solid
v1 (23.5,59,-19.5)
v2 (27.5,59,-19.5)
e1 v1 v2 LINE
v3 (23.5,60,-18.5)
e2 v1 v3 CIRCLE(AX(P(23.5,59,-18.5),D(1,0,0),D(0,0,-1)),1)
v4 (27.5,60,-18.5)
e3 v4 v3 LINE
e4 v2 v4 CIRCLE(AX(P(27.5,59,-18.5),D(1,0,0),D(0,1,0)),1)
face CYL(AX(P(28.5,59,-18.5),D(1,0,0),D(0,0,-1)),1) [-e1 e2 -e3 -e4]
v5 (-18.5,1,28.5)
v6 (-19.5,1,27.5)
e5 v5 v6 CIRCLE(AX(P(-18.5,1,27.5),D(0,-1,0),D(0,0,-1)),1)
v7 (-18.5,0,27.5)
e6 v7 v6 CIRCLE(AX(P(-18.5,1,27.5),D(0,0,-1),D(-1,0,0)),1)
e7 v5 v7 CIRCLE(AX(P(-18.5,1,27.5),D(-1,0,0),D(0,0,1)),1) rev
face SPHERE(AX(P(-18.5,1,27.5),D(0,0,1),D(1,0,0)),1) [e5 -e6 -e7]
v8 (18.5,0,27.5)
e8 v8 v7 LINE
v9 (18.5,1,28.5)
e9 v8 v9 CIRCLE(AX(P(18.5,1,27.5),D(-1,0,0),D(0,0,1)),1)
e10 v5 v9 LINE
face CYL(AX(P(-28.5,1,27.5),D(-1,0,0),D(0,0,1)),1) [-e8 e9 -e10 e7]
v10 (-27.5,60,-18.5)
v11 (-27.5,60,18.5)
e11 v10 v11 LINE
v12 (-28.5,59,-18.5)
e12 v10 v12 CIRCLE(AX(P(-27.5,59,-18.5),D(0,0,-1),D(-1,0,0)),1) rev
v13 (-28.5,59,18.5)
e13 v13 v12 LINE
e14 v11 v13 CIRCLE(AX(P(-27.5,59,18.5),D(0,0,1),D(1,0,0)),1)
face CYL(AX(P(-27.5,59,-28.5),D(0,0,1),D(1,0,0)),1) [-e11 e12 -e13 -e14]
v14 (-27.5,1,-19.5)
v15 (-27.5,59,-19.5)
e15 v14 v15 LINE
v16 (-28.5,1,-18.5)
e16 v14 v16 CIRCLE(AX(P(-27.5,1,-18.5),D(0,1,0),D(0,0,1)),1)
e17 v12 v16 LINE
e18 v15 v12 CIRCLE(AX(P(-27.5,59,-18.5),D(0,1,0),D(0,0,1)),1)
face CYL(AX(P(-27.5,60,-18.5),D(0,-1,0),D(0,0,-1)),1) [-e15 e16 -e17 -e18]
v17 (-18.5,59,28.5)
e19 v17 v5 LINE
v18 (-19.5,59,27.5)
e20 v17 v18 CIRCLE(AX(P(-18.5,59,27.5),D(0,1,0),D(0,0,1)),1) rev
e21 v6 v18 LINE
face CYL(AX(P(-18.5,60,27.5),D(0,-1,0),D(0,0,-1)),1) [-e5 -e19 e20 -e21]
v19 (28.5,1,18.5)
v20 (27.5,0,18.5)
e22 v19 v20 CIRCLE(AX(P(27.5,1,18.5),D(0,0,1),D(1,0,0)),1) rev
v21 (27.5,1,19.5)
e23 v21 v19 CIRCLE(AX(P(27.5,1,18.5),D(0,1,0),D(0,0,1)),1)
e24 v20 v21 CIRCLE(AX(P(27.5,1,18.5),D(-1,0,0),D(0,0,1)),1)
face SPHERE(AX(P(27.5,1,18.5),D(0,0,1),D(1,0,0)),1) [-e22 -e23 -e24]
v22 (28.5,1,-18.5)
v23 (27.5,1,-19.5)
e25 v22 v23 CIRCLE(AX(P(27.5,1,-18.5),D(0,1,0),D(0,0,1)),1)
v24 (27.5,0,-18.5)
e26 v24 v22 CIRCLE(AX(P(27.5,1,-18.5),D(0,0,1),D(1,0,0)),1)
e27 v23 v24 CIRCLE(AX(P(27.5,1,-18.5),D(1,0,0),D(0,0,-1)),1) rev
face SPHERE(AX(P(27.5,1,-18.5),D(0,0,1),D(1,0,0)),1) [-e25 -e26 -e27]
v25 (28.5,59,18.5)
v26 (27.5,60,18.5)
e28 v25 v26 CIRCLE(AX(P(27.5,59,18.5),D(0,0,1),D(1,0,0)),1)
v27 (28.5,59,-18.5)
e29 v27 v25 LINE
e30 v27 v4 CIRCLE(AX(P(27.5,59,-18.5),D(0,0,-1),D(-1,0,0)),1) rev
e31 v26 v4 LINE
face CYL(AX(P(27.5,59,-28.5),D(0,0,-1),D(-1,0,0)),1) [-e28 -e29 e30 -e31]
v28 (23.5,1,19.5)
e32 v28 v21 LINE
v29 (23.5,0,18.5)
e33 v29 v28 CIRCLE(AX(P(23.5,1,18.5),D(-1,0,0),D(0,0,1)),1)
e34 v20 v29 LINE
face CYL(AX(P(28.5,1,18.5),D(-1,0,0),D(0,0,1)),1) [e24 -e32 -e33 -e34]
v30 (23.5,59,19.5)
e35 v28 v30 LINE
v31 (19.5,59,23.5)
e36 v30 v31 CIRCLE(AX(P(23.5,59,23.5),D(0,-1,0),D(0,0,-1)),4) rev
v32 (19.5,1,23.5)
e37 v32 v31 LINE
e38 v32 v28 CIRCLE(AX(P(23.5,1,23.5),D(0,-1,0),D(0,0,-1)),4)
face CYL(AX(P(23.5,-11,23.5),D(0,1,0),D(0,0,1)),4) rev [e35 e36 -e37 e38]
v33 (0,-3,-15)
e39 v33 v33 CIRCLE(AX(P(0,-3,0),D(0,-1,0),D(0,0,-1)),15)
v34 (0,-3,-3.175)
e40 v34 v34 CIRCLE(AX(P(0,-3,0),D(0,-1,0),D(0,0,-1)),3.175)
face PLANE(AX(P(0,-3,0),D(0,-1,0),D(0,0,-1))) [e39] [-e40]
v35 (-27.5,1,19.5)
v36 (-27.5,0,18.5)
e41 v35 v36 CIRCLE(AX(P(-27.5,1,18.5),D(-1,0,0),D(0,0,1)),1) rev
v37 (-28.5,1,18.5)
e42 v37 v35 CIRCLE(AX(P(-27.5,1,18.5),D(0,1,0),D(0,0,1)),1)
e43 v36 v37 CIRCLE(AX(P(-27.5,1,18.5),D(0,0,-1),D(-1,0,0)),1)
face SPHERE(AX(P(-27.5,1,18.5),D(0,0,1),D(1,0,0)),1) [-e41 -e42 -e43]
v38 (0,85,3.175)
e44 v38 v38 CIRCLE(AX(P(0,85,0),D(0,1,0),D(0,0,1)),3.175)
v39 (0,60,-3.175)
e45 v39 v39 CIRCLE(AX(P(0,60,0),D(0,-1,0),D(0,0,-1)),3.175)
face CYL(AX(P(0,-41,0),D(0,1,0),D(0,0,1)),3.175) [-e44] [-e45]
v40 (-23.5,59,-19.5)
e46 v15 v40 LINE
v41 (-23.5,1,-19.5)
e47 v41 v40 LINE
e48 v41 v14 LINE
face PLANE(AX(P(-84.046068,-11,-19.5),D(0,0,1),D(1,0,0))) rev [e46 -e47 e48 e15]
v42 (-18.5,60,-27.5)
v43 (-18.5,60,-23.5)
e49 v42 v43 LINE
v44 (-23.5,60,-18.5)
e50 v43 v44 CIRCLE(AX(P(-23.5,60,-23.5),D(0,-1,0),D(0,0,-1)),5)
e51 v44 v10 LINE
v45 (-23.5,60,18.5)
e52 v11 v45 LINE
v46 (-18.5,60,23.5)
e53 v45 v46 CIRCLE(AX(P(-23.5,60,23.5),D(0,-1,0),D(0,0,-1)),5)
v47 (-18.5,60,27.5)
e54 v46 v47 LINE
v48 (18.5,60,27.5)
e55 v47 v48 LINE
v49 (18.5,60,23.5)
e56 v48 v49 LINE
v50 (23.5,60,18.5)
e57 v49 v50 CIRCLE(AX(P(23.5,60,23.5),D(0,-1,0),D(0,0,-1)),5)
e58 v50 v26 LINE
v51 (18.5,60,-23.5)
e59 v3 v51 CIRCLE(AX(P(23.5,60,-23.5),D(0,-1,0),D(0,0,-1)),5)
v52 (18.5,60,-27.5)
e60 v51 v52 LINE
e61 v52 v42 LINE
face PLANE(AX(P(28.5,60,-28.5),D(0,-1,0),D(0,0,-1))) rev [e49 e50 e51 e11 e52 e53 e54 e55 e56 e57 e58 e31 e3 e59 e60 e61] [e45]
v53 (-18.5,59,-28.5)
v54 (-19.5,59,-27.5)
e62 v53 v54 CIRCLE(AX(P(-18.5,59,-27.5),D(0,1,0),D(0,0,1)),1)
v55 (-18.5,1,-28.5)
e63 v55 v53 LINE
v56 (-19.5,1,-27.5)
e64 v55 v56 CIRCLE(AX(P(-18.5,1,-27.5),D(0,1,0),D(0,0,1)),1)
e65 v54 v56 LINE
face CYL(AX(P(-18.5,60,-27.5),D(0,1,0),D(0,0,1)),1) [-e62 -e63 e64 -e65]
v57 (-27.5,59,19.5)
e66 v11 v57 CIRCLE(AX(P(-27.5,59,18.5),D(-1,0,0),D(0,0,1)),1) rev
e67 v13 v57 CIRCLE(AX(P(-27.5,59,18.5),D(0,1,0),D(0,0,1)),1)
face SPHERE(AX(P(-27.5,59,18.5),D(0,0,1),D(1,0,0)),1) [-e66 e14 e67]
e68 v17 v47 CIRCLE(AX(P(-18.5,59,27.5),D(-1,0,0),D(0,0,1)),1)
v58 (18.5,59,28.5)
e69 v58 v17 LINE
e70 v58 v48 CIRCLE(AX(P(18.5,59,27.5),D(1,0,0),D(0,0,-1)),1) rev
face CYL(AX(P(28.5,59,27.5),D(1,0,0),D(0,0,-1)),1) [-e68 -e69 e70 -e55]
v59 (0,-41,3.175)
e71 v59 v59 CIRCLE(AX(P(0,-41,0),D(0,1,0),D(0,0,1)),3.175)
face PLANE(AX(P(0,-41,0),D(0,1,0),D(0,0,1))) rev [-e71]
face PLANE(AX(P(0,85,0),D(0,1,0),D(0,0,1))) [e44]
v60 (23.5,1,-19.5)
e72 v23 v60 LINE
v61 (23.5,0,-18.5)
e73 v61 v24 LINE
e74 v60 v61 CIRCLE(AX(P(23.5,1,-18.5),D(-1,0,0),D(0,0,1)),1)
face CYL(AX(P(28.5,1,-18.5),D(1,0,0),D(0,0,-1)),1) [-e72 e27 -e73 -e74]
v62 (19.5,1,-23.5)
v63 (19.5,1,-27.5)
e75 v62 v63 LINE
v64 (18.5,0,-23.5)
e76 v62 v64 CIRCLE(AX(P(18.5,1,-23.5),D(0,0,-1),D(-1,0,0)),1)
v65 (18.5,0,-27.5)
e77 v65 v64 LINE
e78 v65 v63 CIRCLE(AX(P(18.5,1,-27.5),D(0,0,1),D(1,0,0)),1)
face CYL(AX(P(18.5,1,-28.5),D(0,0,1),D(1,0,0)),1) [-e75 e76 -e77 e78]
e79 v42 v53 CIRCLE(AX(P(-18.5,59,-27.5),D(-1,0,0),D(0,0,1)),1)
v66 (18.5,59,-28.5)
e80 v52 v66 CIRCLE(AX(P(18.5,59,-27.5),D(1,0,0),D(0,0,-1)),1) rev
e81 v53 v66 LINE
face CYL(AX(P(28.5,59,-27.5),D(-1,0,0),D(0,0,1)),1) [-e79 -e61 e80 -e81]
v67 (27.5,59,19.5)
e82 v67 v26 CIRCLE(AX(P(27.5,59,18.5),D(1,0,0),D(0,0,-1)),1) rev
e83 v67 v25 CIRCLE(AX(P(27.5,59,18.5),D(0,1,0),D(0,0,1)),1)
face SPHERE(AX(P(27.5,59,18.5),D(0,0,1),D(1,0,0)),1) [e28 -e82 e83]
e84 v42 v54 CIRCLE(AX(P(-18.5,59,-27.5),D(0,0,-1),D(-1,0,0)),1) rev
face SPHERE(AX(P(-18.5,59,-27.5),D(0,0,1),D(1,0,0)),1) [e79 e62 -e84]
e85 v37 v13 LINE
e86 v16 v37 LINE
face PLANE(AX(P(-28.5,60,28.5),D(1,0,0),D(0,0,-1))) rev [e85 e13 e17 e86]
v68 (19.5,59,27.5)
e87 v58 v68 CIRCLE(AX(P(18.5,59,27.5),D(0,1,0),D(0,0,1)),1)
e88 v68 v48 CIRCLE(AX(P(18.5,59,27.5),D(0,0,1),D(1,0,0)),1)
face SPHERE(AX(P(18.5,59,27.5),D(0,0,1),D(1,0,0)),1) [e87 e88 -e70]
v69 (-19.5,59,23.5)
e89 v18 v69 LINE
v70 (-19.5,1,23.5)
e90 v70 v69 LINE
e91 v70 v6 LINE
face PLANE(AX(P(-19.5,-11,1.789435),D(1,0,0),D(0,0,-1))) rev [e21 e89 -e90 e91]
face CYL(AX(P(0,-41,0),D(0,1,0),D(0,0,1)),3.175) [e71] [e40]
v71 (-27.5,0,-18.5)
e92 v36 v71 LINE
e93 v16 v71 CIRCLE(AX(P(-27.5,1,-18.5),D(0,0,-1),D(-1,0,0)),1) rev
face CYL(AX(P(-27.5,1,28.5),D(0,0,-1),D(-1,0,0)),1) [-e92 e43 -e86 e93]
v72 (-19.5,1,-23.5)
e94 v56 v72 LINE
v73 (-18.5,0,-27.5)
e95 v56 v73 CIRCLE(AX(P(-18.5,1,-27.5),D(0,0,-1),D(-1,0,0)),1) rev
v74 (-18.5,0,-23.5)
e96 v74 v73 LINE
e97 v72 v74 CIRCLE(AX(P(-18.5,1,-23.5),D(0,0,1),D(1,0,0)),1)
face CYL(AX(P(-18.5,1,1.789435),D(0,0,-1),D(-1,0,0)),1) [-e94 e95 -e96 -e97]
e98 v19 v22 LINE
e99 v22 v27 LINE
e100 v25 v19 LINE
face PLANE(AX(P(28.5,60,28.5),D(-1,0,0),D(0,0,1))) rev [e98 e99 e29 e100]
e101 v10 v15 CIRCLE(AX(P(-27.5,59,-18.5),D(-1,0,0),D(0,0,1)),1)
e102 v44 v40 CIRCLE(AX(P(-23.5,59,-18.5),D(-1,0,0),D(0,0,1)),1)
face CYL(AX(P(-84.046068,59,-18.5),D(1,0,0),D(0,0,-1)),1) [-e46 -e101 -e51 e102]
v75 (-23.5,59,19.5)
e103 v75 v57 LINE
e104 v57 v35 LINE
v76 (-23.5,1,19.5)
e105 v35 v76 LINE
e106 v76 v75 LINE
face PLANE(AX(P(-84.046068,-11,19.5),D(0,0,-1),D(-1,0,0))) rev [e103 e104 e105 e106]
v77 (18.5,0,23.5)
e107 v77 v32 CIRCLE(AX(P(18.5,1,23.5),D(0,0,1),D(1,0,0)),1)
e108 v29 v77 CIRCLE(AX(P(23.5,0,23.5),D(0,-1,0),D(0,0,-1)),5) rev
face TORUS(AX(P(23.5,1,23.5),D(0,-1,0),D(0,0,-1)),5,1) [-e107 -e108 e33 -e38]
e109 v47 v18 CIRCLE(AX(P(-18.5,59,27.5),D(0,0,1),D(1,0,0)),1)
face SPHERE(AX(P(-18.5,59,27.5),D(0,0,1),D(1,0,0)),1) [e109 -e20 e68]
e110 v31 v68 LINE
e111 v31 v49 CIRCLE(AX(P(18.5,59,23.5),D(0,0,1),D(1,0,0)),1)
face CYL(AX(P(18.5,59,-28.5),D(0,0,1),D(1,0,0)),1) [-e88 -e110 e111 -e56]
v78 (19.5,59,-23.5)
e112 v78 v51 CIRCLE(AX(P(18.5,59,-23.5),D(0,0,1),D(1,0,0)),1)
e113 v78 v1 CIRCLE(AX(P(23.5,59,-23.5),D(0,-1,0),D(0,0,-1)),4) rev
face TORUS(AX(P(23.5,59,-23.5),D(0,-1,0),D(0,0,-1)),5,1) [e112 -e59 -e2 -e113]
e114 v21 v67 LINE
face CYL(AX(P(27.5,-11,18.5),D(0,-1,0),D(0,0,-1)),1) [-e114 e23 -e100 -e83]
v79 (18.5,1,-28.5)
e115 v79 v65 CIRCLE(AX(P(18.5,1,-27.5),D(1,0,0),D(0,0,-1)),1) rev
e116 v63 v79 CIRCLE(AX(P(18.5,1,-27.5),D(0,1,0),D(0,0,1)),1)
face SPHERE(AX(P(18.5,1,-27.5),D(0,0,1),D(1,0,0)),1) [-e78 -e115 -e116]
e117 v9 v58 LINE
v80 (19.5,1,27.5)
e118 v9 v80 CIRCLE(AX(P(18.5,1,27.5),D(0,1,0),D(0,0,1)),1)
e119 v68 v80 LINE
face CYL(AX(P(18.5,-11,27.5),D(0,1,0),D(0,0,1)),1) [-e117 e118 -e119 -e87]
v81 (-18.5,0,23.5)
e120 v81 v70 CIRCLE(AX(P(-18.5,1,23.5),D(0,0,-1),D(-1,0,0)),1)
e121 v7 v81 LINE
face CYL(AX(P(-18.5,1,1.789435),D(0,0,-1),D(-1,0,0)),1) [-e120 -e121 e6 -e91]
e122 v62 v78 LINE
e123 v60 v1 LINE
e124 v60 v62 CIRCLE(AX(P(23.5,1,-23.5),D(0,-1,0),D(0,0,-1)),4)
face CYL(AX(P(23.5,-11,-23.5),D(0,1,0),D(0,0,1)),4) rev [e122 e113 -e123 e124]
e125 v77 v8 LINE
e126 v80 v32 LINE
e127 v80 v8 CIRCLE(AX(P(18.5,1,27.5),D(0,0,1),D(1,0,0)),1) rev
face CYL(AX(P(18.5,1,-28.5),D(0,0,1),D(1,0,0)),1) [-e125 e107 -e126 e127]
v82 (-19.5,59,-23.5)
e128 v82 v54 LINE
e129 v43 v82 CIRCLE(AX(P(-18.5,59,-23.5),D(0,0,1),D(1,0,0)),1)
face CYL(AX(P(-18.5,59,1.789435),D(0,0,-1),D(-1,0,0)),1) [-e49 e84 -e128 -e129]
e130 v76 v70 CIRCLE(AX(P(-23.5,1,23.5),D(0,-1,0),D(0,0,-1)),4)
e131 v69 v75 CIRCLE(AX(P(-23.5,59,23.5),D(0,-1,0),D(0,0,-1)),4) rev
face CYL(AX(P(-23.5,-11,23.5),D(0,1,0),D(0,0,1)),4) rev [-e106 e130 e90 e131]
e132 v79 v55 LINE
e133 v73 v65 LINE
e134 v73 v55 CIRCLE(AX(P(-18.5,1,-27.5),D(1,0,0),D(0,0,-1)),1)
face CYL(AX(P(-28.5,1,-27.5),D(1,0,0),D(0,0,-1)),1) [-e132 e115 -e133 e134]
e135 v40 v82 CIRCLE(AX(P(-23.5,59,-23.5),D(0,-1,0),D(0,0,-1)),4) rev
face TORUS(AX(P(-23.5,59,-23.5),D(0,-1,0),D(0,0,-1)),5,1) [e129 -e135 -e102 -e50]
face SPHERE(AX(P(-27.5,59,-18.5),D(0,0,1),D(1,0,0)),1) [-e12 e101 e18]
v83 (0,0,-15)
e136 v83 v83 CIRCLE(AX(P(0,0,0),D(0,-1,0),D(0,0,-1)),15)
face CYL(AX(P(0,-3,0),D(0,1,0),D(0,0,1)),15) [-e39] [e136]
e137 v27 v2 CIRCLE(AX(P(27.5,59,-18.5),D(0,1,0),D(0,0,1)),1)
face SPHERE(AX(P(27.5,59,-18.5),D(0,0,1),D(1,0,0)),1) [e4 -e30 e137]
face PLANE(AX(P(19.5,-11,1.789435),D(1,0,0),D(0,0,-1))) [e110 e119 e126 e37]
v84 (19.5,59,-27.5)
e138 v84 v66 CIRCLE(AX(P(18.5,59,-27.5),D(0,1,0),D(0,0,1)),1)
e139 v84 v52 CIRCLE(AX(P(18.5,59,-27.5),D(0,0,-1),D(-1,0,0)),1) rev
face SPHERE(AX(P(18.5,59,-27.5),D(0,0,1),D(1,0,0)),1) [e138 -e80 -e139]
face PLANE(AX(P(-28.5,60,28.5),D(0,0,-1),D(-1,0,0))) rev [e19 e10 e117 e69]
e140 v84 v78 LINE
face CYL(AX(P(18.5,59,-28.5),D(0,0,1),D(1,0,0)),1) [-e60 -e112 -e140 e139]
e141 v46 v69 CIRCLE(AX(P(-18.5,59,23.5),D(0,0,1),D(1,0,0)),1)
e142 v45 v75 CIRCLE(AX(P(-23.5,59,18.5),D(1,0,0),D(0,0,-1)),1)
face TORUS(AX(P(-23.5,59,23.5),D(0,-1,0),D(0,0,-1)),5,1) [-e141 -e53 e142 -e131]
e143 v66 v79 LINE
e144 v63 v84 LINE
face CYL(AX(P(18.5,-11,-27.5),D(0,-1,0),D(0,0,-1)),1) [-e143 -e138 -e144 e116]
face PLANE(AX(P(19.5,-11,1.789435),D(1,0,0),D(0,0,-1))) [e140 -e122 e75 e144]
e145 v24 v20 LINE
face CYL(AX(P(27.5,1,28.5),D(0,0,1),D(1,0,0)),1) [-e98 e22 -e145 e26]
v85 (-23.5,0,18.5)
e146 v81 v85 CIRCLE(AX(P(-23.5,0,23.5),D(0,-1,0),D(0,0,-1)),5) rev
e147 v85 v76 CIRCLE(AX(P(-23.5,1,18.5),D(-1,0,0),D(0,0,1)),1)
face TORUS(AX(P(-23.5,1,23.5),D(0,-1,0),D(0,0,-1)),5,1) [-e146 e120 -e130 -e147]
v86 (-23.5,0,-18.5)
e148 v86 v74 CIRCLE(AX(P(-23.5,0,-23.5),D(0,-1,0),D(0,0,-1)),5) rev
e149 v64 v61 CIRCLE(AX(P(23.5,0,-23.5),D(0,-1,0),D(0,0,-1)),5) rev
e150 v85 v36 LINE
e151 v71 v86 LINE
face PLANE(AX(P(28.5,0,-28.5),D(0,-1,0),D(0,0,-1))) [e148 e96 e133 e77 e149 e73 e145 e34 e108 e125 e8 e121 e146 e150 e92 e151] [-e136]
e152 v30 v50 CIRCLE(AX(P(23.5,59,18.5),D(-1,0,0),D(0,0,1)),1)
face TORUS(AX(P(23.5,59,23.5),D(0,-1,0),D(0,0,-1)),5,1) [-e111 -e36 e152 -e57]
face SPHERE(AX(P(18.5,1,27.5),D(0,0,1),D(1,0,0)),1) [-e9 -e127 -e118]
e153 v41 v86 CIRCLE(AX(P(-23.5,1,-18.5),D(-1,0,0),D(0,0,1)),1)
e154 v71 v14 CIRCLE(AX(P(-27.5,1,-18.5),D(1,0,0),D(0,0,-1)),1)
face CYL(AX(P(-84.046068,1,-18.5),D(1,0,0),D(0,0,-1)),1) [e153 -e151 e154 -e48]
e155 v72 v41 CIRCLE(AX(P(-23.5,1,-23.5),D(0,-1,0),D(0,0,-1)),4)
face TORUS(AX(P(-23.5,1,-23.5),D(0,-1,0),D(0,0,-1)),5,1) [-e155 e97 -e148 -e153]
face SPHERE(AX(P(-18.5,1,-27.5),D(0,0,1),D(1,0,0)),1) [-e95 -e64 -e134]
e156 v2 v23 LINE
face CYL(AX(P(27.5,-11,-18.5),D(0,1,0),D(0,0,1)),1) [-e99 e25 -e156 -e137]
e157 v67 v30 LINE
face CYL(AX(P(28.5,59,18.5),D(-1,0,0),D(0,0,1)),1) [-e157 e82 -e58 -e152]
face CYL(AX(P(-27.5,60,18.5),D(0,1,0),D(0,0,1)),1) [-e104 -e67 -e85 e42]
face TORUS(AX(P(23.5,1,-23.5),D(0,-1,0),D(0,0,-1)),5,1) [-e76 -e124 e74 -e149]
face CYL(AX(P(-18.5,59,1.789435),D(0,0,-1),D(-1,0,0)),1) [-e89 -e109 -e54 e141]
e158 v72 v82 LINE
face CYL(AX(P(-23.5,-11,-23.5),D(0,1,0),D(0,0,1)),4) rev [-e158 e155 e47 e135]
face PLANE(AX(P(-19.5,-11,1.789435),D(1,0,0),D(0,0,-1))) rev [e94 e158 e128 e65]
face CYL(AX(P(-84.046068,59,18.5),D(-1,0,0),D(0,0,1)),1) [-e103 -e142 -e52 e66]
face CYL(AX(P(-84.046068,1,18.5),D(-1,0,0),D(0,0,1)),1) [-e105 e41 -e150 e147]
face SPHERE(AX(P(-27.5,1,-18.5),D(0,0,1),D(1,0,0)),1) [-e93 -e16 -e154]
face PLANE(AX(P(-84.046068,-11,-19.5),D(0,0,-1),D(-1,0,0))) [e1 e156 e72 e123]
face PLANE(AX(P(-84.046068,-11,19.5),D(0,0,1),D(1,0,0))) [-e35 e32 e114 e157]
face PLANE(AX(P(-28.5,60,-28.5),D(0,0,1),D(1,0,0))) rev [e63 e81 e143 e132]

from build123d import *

# Parameters (mm, degrees)
SKETCH1_W                = 57
SKETCH1_H                = 57
EXTRUDE1_DEPTH           = 60
F_5_0_5_DIAMETER_HOLE1_D = 5
SKETCH6_R                = 4
SKETCH6_R_2              = 2.5
EXTRUDE4_DEPTH           = 71
FILLET1_R                = 1
EXTRUDE5_DEPTH           = 25
EXTRUDE5_DEPTH_BACK      = 101
SKETCH7_R                = 3.175
SKETCH8_R                = 15
EXTRUDE6_DEPTH           = 3
FILLET2_R                = 1


with BuildPart() as part:
    # Sketch1 → Extrude1 (new body)
    with BuildSketch(Plane(origin=(0, 0, 0), x_dir=(1, 0, 0), z_dir=(0, 1, 0))):
        Rectangle(SKETCH1_W, SKETCH1_H)
    extrude(amount=EXTRUDE1_DEPTH)

    # Ø5.0 (5) Diameter Hole1 (through all)
    with Locations(Plane.XZ):
        with Locations((-23.5, 23.5), (23.5, 23.5), (23.5, -23.5), (-23.5, -23.5)):
            Hole(F_5_0_5_DIAMETER_HOLE1_D / 2)

    # Sketch6 → Extrude4 (cut)
    # profile 1 of 12: a face of its own
    with BuildSketch(Plane(origin=(0, 60, 0), x_dir=(1, 0, 0), z_dir=(0, 1, 0))):
        Polygon((-28.5, 28.5), (-19.5, 28.5), (-19.5, 32.511741208), (-33.908905561, 32.511741208), (-33.908905561, 19.5), (-28.5, 19.5), align=None)
    # profile 2 of 12: a face of its own
    with BuildSketch(Plane(origin=(0, 60, 0), x_dir=(1, 0, 0), z_dir=(0, 1, 0))):
        with BuildLine():
            ThreePointArc((-23.5, 19.5), (-26.328427125, 26.328427125), (-19.5, 23.5))
            Line((-19.5, 23.5), (-19.5, 28.5))
            Line((-19.5, 28.5), (-28.5, 28.5))
            Line((-28.5, 28.5), (-28.5, 19.5))
            Line((-28.5, 19.5), (-23.5, 19.5))
        make_face()
    # profile 3 of 12: a face of its own
    with BuildSketch(Plane(origin=(0, 60, 0), x_dir=(1, 0, 0), z_dir=(0, 1, 0))):
        with Locations((-23.5, 23.5)):
            Circle(SKETCH6_R)
        with Locations((-23.5, 23.5)):
            Circle(SKETCH6_R_2, mode=Mode.SUBTRACT)
    # profile 4 of 12: a face of its own
    with BuildSketch(Plane(origin=(0, 60, 0), x_dir=(1, 0, 0), z_dir=(0, 1, 0))):
        Polygon((19.5, 36.471560472), (19.5, 28.5), (28.5, 28.5), (28.5, 19.5), (41.168352552, 19.5), (41.168352552, 36.471560472), align=None)
    # profile 5 of 12: a face of its own
    with BuildSketch(Plane(origin=(0, 60, 0), x_dir=(1, 0, 0), z_dir=(0, 1, 0))):
        with BuildLine():
            Line((28.5, 28.5), (19.5, 28.5))
            Line((19.5, 28.5), (19.5, 23.5))
            ThreePointArc((19.5, 23.5), (23.5, 27.5), (27.5, 23.5))
            ThreePointArc((27.5, 23.5), (26.328427125, 20.671572875), (23.5, 19.5))
            Line((23.5, 19.5), (28.5, 19.5))
            Line((28.5, 19.5), (28.5, 28.5))
        make_face()
    # profile 6 of 12: a face of its own
    with BuildSketch(Plane(origin=(0, 60, 0), x_dir=(1, 0, 0), z_dir=(0, 1, 0))):
        with Locations((23.5, 23.5)):
            Circle(SKETCH6_R)
        with Locations((23.5, 23.5)):
            Circle(SKETCH6_R_2, mode=Mode.SUBTRACT)
    # profile 7 of 12: a face of its own
    with BuildSketch(Plane(origin=(0, 60, 0), x_dir=(1, 0, 0), z_dir=(0, 1, 0))):
        with Locations((23.5, -23.5)):
            Circle(SKETCH6_R)
        with Locations((23.5, -23.5)):
            Circle(SKETCH6_R_2, mode=Mode.SUBTRACT)
    # profile 8 of 12: a face of its own
    with BuildSketch(Plane(origin=(0, 60, 0), x_dir=(1, 0, 0), z_dir=(0, 1, 0))):
        with BuildLine():
            Line((28.5, -28.5), (28.5, -19.5))
            Line((28.5, -19.5), (23.5, -19.5))
            ThreePointArc((23.5, -19.5), (26.328427125, -20.671572875), (27.5, -23.5))
            ThreePointArc((27.5, -23.5), (23.5, -27.5), (19.5, -23.5))
            Line((19.5, -23.5), (19.5, -28.5))
            Line((19.5, -28.5), (28.5, -28.5))
        make_face()
    # profile 9 of 12: a face of its own
    with BuildSketch(Plane(origin=(0, 60, 0), x_dir=(1, 0, 0), z_dir=(0, 1, 0))):
        Polygon((44.252209519, -19.5), (28.5, -19.5), (28.5, -28.5), (19.5, -28.5), (19.5, -40.050429997), (44.252209519, -40.050429997), align=None)
    # profile 10 of 12: a face of its own
    with BuildSketch(Plane(origin=(0, 60, 0), x_dir=(1, 0, 0), z_dir=(0, 1, 0))):
        Polygon((-28.5, -28.5), (-28.5, -19.5), (-37.670786859, -19.5), (-37.670786859, -37.828231874), (-19.5, -37.828231874), (-19.5, -28.5), align=None)
    # profile 11 of 12: a face of its own
    with BuildSketch(Plane(origin=(0, 60, 0), x_dir=(1, 0, 0), z_dir=(0, 1, 0))):
        with BuildLine():
            Line((-23.5, -19.5), (-28.5, -19.5))
            Line((-28.5, -19.5), (-28.5, -28.5))
            Line((-28.5, -28.5), (-19.5, -28.5))
            Line((-19.5, -28.5), (-19.5, -23.5))
            ThreePointArc((-19.5, -23.5), (-26.328427125, -26.328427125), (-23.5, -19.5))
        make_face()
    # profile 12 of 12: a face of its own
    with BuildSketch(Plane(origin=(0, 60, 0), x_dir=(1, 0, 0), z_dir=(0, 1, 0))):
        with Locations((-23.5, -23.5)):
            Circle(SKETCH6_R)
        with Locations((-23.5, -23.5)):
            Circle(SKETCH6_R_2, mode=Mode.SUBTRACT)
    extrude(amount=-EXTRUDE4_DEPTH, mode=Mode.SUBTRACT)

    # Fillet1
    fillet1_edges = [part.edges().sort_by_distance(p)[0] for p in [
        (0, 0, 28.5),
        (-20.671572875, 0, 20.671572875),
        (-19.5, 0, 26),
        (-26, 0, 19.5),
        (-28.5, 0, 0),
        (-20.671572875, 0, -20.671572875),
        (-19.5, 0, -26),
        (-26, 0, -19.5),
        (0, 0, -28.5),
        (20.671572875, 0, -20.671572875),
        (26, 0, -19.5),
        (19.5, 0, -26),
        (28.5, 0, 0),
        (20.671572875, 0, 20.671572875),
        (26, 0, 19.5),
        (19.5, 0, 26),
    ]]
    fillet(fillet1_edges, radius=FILLET1_R)



with BuildPart() as body_2:
    # Sketch7 → Extrude5 (new, two sides: drawn at the far end of the back side and taken through both)
    with BuildSketch(Plane(origin=(0, 60, 0), x_dir=(1, 0, 0), z_dir=(0, 1, 0)).offset(-EXTRUDE5_DEPTH_BACK)):
        with Locations(Location((0, 0, 0), (0, 0, 270))):
            Circle(SKETCH7_R)
    extrude(amount=EXTRUDE5_DEPTH + EXTRUDE5_DEPTH_BACK)


with BuildPart() as part_1:
    add(part.part)

    add(body_2.part)  # Extrude6 merges body 2
    # Sketch8 → Extrude6 (add)
    with BuildSketch(Plane.XZ):
        with Locations(Location((0, 0, 0), (0, 0, 270))):
            Circle(SKETCH8_R)
    extrude(amount=EXTRUDE6_DEPTH)

    # Fillet2
    # the kernel refuses this fillet: 1 mm, written as the material it takes off along each edge
    with BuildSketch(Plane(origin=(27.5, 1, -18.5), x_dir=(0, 0, -1), z_dir=(1, 0, 0))) as fillet2_piece_1_section:
        Polygon((0, 0), (FILLET2_R, 0), (FILLET2_R, -FILLET2_R), (0, -FILLET2_R), align=None)
    fillet2_piece_1 = extrude(amount=FILLET2_R, mode=Mode.PRIVATE)
    fillet2_piece_1 = fillet2_piece_1 - Plane(origin=(27.5, 1, -18.5), x_dir=(0, 0.7071067811865475, 0.7071067811865475), z_dir=(1, 0, 0)) * Sphere(FILLET2_R, mode=Mode.PRIVATE)
    add(fillet2_piece_1, mode=Mode.SUBTRACT)
    with BuildSketch(Plane(origin=(27.5, 1, 18.5), x_dir=(1, 0, 0), z_dir=(0, 0, 1))) as fillet2_piece_2_section:
        Polygon((0, 0), (FILLET2_R, 0), (FILLET2_R, -FILLET2_R), (0, -FILLET2_R), align=None)
    fillet2_piece_2 = extrude(amount=FILLET2_R, mode=Mode.PRIVATE)
    fillet2_piece_2 = fillet2_piece_2 - Plane(origin=(27.5, 1, 18.5), x_dir=(-0.7071067811865475, 0.7071067811865475, 0), z_dir=(0, 0, 1)) * Sphere(FILLET2_R, mode=Mode.PRIVATE)
    add(fillet2_piece_2, mode=Mode.SUBTRACT)
    with BuildSketch(Plane(origin=(18.5, 1, -27.5), x_dir=(1, 0, 0), z_dir=(0, 0, -1))) as fillet2_piece_3_section:
        Polygon((0, 0), (FILLET2_R, 0), (FILLET2_R, FILLET2_R), (0, FILLET2_R), align=None)
    fillet2_piece_3 = extrude(amount=FILLET2_R, mode=Mode.PRIVATE)
    fillet2_piece_3 = fillet2_piece_3 - Plane(origin=(18.5, 1, -27.5), x_dir=(-0.7071067811865475, 0.7071067811865475, 0), z_dir=(0, 0, -1)) * Sphere(FILLET2_R, mode=Mode.PRIVATE)
    add(fillet2_piece_3, mode=Mode.SUBTRACT)
    with BuildSketch(Plane(origin=(-18.5, 1, -27.5), x_dir=(0, 0, -1), z_dir=(-1, 0, 0))) as fillet2_piece_4_section:
        Polygon((0, 0), (FILLET2_R, 0), (FILLET2_R, FILLET2_R), (0, FILLET2_R), align=None)
    fillet2_piece_4 = extrude(amount=FILLET2_R, mode=Mode.PRIVATE)
    fillet2_piece_4 = fillet2_piece_4 - Plane(origin=(-18.5, 1, -27.5), x_dir=(0, 0.7071067811865475, 0.7071067811865475), z_dir=(-1, 0, 0)) * Sphere(FILLET2_R, mode=Mode.PRIVATE)
    add(fillet2_piece_4, mode=Mode.SUBTRACT)
    with BuildSketch(Plane(origin=(18.5, 1, 27.5), x_dir=(1, 0, 0), z_dir=(0, 0, 1))) as fillet2_piece_5_section:
        Polygon((0, 0), (FILLET2_R, 0), (FILLET2_R, -FILLET2_R), (0, -FILLET2_R), align=None)
    fillet2_piece_5 = extrude(amount=FILLET2_R, mode=Mode.PRIVATE)
    fillet2_piece_5 = fillet2_piece_5 - Plane(origin=(18.5, 1, 27.5), x_dir=(-0.7071067811865475, 0.7071067811865475, 0), z_dir=(0, 0, 1)) * Sphere(FILLET2_R, mode=Mode.PRIVATE)
    add(fillet2_piece_5, mode=Mode.SUBTRACT)
    with BuildSketch(Plane(origin=(-18.5, 1, 27.5), x_dir=(-1, 0, 0), z_dir=(0, 0, 1))) as fillet2_piece_6_section:
        Polygon((0, 0), (FILLET2_R, 0), (FILLET2_R, FILLET2_R), (0, FILLET2_R), align=None)
    fillet2_piece_6 = extrude(amount=FILLET2_R, mode=Mode.PRIVATE)
    fillet2_piece_6 = fillet2_piece_6 - Plane(origin=(-18.5, 1, 27.5), x_dir=(0.7071067811865475, 0.7071067811865475, 0), z_dir=(0, 0, 1)) * Sphere(FILLET2_R, mode=Mode.PRIVATE)
    add(fillet2_piece_6, mode=Mode.SUBTRACT)
    with BuildSketch(Plane(origin=(-27.5, 1, -18.5), x_dir=(0, 0, -1), z_dir=(-1, 0, 0))) as fillet2_piece_7_section:
        Polygon((0, 0), (FILLET2_R, 0), (FILLET2_R, FILLET2_R), (0, FILLET2_R), align=None)
    fillet2_piece_7 = extrude(amount=FILLET2_R, mode=Mode.PRIVATE)
    fillet2_piece_7 = fillet2_piece_7 - Plane(origin=(-27.5, 1, -18.5), x_dir=(0, 0.7071067811865475, 0.7071067811865475), z_dir=(-1, 0, 0)) * Sphere(FILLET2_R, mode=Mode.PRIVATE)
    add(fillet2_piece_7, mode=Mode.SUBTRACT)
    with BuildSketch(Plane(origin=(-27.5, 1, 18.5), x_dir=(-1, 0, 0), z_dir=(0, 0, 1))) as fillet2_piece_8_section:
        Polygon((0, 0), (FILLET2_R, 0), (FILLET2_R, FILLET2_R), (0, FILLET2_R), align=None)
    fillet2_piece_8 = extrude(amount=FILLET2_R, mode=Mode.PRIVATE)
    fillet2_piece_8 = fillet2_piece_8 - Plane(origin=(-27.5, 1, 18.5), x_dir=(0.7071067811865475, 0.7071067811865475, 0), z_dir=(0, 0, 1)) * Sphere(FILLET2_R, mode=Mode.PRIVATE)
    add(fillet2_piece_8, mode=Mode.SUBTRACT)
    with BuildSketch(Plane(origin=(-18.5, 59, 27.5), x_dir=(0, 1, 0), z_dir=(0, 0, 1))) as fillet2_piece_9_section:
        Polygon((0, 0), (FILLET2_R, 0), (FILLET2_R, FILLET2_R), (0, FILLET2_R), align=None)
    fillet2_piece_9 = extrude(amount=FILLET2_R, mode=Mode.PRIVATE)
    fillet2_piece_9 = fillet2_piece_9 - Plane(origin=(-18.5, 59, 27.5), x_dir=(0.7071067811865475, -0.7071067811865475, 0), z_dir=(0, 0, 1)) * Sphere(FILLET2_R, mode=Mode.PRIVATE)
    add(fillet2_piece_9, mode=Mode.SUBTRACT)
    with BuildSketch(Plane(origin=(18.5, 59, 27.5), x_dir=(1, 0, 0), z_dir=(0, 0, 1))) as fillet2_piece_10_section:
        Polygon((0, 0), (FILLET2_R, 0), (FILLET2_R, FILLET2_R), (0, FILLET2_R), align=None)
    fillet2_piece_10 = extrude(amount=FILLET2_R, mode=Mode.PRIVATE)
    fillet2_piece_10 = fillet2_piece_10 - Plane(origin=(18.5, 59, 27.5), x_dir=(-0.7071067811865475, -0.7071067811865475, 0), z_dir=(0, 0, 1)) * Sphere(FILLET2_R, mode=Mode.PRIVATE)
    add(fillet2_piece_10, mode=Mode.SUBTRACT)
    with BuildSketch(Plane(origin=(-27.5, 59, 18.5), x_dir=(0, 0, 1), z_dir=(-1, 0, 0))) as fillet2_piece_11_section:
        Polygon((0, 0), (FILLET2_R, 0), (FILLET2_R, FILLET2_R), (0, FILLET2_R), align=None)
    fillet2_piece_11 = extrude(amount=FILLET2_R, mode=Mode.PRIVATE)
    fillet2_piece_11 = fillet2_piece_11 - Plane(origin=(-27.5, 59, 18.5), x_dir=(0, -0.7071067811865475, -0.7071067811865475), z_dir=(-1, 0, 0)) * Sphere(FILLET2_R, mode=Mode.PRIVATE)
    add(fillet2_piece_11, mode=Mode.SUBTRACT)
    with BuildSketch(Plane(origin=(27.5, 59, 18.5), x_dir=(0, 0, 1), z_dir=(0, 1, 0))) as fillet2_piece_12_section:
        Polygon((0, 0), (FILLET2_R, 0), (FILLET2_R, FILLET2_R), (0, FILLET2_R), align=None)
    fillet2_piece_12 = extrude(amount=FILLET2_R, mode=Mode.PRIVATE)
    fillet2_piece_12 = fillet2_piece_12 - Plane(origin=(27.5, 59, 18.5), x_dir=(-0.7071067811865475, 0, -0.7071067811865475), z_dir=(0, 1, 0)) * Sphere(FILLET2_R, mode=Mode.PRIVATE)
    add(fillet2_piece_12, mode=Mode.SUBTRACT)
    with BuildSketch(Plane(origin=(18.5, 59, -27.5), x_dir=(0, 0, -1), z_dir=(0, 1, 0))) as fillet2_piece_13_section:
        Polygon((0, 0), (FILLET2_R, 0), (FILLET2_R, -FILLET2_R), (0, -FILLET2_R), align=None)
    fillet2_piece_13 = extrude(amount=FILLET2_R, mode=Mode.PRIVATE)
    fillet2_piece_13 = fillet2_piece_13 - Plane(origin=(18.5, 59, -27.5), x_dir=(-0.7071067811865475, 0, 0.7071067811865475), z_dir=(0, 1, 0)) * Sphere(FILLET2_R, mode=Mode.PRIVATE)
    add(fillet2_piece_13, mode=Mode.SUBTRACT)
    with BuildSketch(Plane(origin=(-18.5, 59, -27.5), x_dir=(-1, 0, 0), z_dir=(0, 1, 0))) as fillet2_piece_14_section:
        Polygon((0, 0), (FILLET2_R, 0), (FILLET2_R, -FILLET2_R), (0, -FILLET2_R), align=None)
    fillet2_piece_14 = extrude(amount=FILLET2_R, mode=Mode.PRIVATE)
    fillet2_piece_14 = fillet2_piece_14 - Plane(origin=(-18.5, 59, -27.5), x_dir=(0.7071067811865475, 0, 0.7071067811865475), z_dir=(0, 1, 0)) * Sphere(FILLET2_R, mode=Mode.PRIVATE)
    add(fillet2_piece_14, mode=Mode.SUBTRACT)
    with BuildSketch(Plane(origin=(-27.5, 59, -18.5), x_dir=(0, 1, 0), z_dir=(-1, 0, 0))) as fillet2_piece_15_section:
        Polygon((0, 0), (FILLET2_R, 0), (FILLET2_R, FILLET2_R), (0, FILLET2_R), align=None)
    fillet2_piece_15 = extrude(amount=FILLET2_R, mode=Mode.PRIVATE)
    fillet2_piece_15 = fillet2_piece_15 - Plane(origin=(-27.5, 59, -18.5), x_dir=(0, -0.7071067811865475, 0.7071067811865475), z_dir=(-1, 0, 0)) * Sphere(FILLET2_R, mode=Mode.PRIVATE)
    add(fillet2_piece_15, mode=Mode.SUBTRACT)
    with BuildSketch(Plane(origin=(27.5, 59, -18.5), x_dir=(0, 1, 0), z_dir=(0, 0, -1))) as fillet2_piece_16_section:
        Polygon((0, 0), (FILLET2_R, 0), (FILLET2_R, FILLET2_R), (0, FILLET2_R), align=None)
    fillet2_piece_16 = extrude(amount=FILLET2_R, mode=Mode.PRIVATE)
    fillet2_piece_16 = fillet2_piece_16 - Plane(origin=(27.5, 59, -18.5), x_dir=(-0.7071067811865475, -0.7071067811865475, 0), z_dir=(0, 0, -1)) * Sphere(FILLET2_R, mode=Mode.PRIVATE)
    add(fillet2_piece_16, mode=Mode.SUBTRACT)
    with BuildSketch(Plane(origin=(-18.5, 60, 28.5), x_dir=(0, -1, 0), z_dir=(1, 0, 0))) as fillet2_piece_17:
        with BuildLine():
            CenterArc((FILLET2_R, FILLET2_R), FILLET2_R, 180, 90)
            Line((0, FILLET2_R), (0, 0))
            Line((0, 0), (FILLET2_R, 0))
        make_face()
    extrude(amount=37, mode=Mode.SUBTRACT)
    with BuildSketch(Plane(origin=(-19.5, 59, 28.5), x_dir=(1, 0, 0), z_dir=(0, -1, 0)), Plane(origin=(19.5, 59, -28.5), x_dir=(-1, 0, 0), z_dir=(0, -1, 0)), Plane(origin=(-28.5, 59, -19.5), x_dir=(0, 0, 1), z_dir=(0, -1, 0)), Plane(origin=(28.5, 1, -19.5), x_dir=(0, 0, 1), z_dir=(0, 1, 0)), Plane(origin=(19.5, 1, 28.5), x_dir=(-1, 0, 0), z_dir=(0, 1, 0))) as fillet2_piece_18:
        with BuildLine():
            CenterArc((FILLET2_R, -FILLET2_R), FILLET2_R, 90, 90)
            Line((0, -FILLET2_R), (0, 0))
            Line((0, 0), (FILLET2_R, 0))
        make_face()
    extrude(amount=58, mode=Mode.SUBTRACT)
    with BuildSketch(Plane(origin=(-19.5, 60, 27.5), x_dir=(1, 0, 0), z_dir=(0, 0, -1)), Plane(origin=(-27.5, 60, -19.5), x_dir=(0, 0, 1), z_dir=(1, 0, 0)), Plane(origin=(23.5, 60, -19.5), x_dir=(0, 0, 1), z_dir=(1, 0, 0)), Plane(origin=(27.5, 60, 19.5), x_dir=(0, 0, -1), z_dir=(-1, 0, 0))) as fillet2_piece_19:
        with BuildLine():
            CenterArc((FILLET2_R, FILLET2_R), FILLET2_R, 180, 90)
            Line((0, FILLET2_R), (0, 0))
            Line((0, 0), (FILLET2_R, 0))
        make_face()
    extrude(amount=4, mode=Mode.SUBTRACT)
    with BuildSketch(Plane(origin=(-23.5, 60, 23.5), x_dir=(1, 0, 0), z_dir=(0, 0, 1))) as fillet2_piece_20:
        with BuildLine():
            CenterArc((4 + FILLET2_R, -FILLET2_R), FILLET2_R, 90, 90)
            Line((4, -FILLET2_R), (4, 0))
            Line((4, 0), (4 + FILLET2_R, 0))
        make_face()
    revolve(axis=Axis((-23.5, 60, 23.5), (0, 1, 0)), revolution_arc=90, mode=Mode.SUBTRACT)
    with BuildSketch(Plane(origin=(-27.5, 60, 19.5), x_dir=(0, 0, -1), z_dir=(1, 0, 0)), Plane(origin=(-19.5, 60, -27.5), x_dir=(1, 0, 0), z_dir=(0, 0, 1)), Plane(origin=(19.5, 60, -23.5), x_dir=(-1, 0, 0), z_dir=(0, 0, -1)), Plane(origin=(19.5, 60, 23.5), x_dir=(0, -1, 0), z_dir=(0, 0, 1))) as fillet2_piece_21:
        with BuildLine():
            CenterArc((FILLET2_R, -FILLET2_R), FILLET2_R, 90, 90)
            Line((0, -FILLET2_R), (0, 0))
            Line((0, 0), (FILLET2_R, 0))
        make_face()
    extrude(amount=4, mode=Mode.SUBTRACT)
    with BuildSketch(Plane(origin=(-28.5, 1, 19.5), x_dir=(1, 0, 0), z_dir=(0, 1, 0)), Plane(origin=(28.5, 59, 19.5), x_dir=(-1, 0, 0), z_dir=(0, -1, 0)), Plane(origin=(-19.5, 1, -28.5), x_dir=(0, 0, 1), z_dir=(0, 1, 0))) as fillet2_piece_22:
        with BuildLine():
            CenterArc((FILLET2_R, FILLET2_R), FILLET2_R, 180, 90)
            Line((0, FILLET2_R), (0, 0))
            Line((0, 0), (FILLET2_R, 0))
        make_face()
    extrude(amount=58, mode=Mode.SUBTRACT)
    with BuildSketch(Plane(origin=(-28.5, 60, -18.5), x_dir=(1, 0, 0), z_dir=(0, 0, 1)), Plane(origin=(18.5, 60, -28.5), x_dir=(0, 0, 1), z_dir=(-1, 0, 0)), Plane(origin=(28.5, 60, 18.5), x_dir=(-1, 0, 0), z_dir=(0, 0, -1))) as fillet2_piece_23:
        with BuildLine():
            CenterArc((FILLET2_R, -FILLET2_R), FILLET2_R, 90, 90)
            Line((0, -FILLET2_R), (0, 0))
            Line((0, 0), (FILLET2_R, 0))
        make_face()
    extrude(amount=37, mode=Mode.SUBTRACT)
    with BuildSketch(Plane(origin=(-23.5, 60, -23.5), x_dir=(0, 0, 1), z_dir=(-1, 0, 0))) as fillet2_piece_24:
        with BuildLine():
            CenterArc((4 + FILLET2_R, -FILLET2_R), FILLET2_R, 90, 90)
            Line((4, -FILLET2_R), (4, 0))
            Line((4, 0), (4 + FILLET2_R, 0))
        make_face()
    revolve(axis=Axis((-23.5, 60, -23.5), (0, 1, 0)), revolution_arc=90, mode=Mode.SUBTRACT)
    with BuildSketch(Plane(origin=(23.5, 60, -23.5), x_dir=(-1, 0, 0), z_dir=(0, 0, -1))) as fillet2_piece_25:
        with BuildLine():
            CenterArc((4 + FILLET2_R, -FILLET2_R), FILLET2_R, 90, 90)
            Line((4, -FILLET2_R), (4, 0))
            Line((4, 0), (4 + FILLET2_R, 0))
        make_face()
    revolve(axis=Axis((23.5, 60, -23.5), (0, 1, 0)), revolution_arc=90, mode=Mode.SUBTRACT)
    with BuildSketch(Plane(origin=(23.5, 60, 23.5), x_dir=(0, 0, -1), z_dir=(1, 0, 0))) as fillet2_piece_26:
        with BuildLine():
            CenterArc((4 + FILLET2_R, -FILLET2_R), FILLET2_R, 90, 90)
            Line((4, -FILLET2_R), (4, 0))
            Line((4, 0), (4 + FILLET2_R, 0))
        make_face()
    revolve(axis=Axis((23.5, 60, 23.5), (0, 1, 0)), revolution_arc=90, mode=Mode.SUBTRACT)


solid = part_1.part
